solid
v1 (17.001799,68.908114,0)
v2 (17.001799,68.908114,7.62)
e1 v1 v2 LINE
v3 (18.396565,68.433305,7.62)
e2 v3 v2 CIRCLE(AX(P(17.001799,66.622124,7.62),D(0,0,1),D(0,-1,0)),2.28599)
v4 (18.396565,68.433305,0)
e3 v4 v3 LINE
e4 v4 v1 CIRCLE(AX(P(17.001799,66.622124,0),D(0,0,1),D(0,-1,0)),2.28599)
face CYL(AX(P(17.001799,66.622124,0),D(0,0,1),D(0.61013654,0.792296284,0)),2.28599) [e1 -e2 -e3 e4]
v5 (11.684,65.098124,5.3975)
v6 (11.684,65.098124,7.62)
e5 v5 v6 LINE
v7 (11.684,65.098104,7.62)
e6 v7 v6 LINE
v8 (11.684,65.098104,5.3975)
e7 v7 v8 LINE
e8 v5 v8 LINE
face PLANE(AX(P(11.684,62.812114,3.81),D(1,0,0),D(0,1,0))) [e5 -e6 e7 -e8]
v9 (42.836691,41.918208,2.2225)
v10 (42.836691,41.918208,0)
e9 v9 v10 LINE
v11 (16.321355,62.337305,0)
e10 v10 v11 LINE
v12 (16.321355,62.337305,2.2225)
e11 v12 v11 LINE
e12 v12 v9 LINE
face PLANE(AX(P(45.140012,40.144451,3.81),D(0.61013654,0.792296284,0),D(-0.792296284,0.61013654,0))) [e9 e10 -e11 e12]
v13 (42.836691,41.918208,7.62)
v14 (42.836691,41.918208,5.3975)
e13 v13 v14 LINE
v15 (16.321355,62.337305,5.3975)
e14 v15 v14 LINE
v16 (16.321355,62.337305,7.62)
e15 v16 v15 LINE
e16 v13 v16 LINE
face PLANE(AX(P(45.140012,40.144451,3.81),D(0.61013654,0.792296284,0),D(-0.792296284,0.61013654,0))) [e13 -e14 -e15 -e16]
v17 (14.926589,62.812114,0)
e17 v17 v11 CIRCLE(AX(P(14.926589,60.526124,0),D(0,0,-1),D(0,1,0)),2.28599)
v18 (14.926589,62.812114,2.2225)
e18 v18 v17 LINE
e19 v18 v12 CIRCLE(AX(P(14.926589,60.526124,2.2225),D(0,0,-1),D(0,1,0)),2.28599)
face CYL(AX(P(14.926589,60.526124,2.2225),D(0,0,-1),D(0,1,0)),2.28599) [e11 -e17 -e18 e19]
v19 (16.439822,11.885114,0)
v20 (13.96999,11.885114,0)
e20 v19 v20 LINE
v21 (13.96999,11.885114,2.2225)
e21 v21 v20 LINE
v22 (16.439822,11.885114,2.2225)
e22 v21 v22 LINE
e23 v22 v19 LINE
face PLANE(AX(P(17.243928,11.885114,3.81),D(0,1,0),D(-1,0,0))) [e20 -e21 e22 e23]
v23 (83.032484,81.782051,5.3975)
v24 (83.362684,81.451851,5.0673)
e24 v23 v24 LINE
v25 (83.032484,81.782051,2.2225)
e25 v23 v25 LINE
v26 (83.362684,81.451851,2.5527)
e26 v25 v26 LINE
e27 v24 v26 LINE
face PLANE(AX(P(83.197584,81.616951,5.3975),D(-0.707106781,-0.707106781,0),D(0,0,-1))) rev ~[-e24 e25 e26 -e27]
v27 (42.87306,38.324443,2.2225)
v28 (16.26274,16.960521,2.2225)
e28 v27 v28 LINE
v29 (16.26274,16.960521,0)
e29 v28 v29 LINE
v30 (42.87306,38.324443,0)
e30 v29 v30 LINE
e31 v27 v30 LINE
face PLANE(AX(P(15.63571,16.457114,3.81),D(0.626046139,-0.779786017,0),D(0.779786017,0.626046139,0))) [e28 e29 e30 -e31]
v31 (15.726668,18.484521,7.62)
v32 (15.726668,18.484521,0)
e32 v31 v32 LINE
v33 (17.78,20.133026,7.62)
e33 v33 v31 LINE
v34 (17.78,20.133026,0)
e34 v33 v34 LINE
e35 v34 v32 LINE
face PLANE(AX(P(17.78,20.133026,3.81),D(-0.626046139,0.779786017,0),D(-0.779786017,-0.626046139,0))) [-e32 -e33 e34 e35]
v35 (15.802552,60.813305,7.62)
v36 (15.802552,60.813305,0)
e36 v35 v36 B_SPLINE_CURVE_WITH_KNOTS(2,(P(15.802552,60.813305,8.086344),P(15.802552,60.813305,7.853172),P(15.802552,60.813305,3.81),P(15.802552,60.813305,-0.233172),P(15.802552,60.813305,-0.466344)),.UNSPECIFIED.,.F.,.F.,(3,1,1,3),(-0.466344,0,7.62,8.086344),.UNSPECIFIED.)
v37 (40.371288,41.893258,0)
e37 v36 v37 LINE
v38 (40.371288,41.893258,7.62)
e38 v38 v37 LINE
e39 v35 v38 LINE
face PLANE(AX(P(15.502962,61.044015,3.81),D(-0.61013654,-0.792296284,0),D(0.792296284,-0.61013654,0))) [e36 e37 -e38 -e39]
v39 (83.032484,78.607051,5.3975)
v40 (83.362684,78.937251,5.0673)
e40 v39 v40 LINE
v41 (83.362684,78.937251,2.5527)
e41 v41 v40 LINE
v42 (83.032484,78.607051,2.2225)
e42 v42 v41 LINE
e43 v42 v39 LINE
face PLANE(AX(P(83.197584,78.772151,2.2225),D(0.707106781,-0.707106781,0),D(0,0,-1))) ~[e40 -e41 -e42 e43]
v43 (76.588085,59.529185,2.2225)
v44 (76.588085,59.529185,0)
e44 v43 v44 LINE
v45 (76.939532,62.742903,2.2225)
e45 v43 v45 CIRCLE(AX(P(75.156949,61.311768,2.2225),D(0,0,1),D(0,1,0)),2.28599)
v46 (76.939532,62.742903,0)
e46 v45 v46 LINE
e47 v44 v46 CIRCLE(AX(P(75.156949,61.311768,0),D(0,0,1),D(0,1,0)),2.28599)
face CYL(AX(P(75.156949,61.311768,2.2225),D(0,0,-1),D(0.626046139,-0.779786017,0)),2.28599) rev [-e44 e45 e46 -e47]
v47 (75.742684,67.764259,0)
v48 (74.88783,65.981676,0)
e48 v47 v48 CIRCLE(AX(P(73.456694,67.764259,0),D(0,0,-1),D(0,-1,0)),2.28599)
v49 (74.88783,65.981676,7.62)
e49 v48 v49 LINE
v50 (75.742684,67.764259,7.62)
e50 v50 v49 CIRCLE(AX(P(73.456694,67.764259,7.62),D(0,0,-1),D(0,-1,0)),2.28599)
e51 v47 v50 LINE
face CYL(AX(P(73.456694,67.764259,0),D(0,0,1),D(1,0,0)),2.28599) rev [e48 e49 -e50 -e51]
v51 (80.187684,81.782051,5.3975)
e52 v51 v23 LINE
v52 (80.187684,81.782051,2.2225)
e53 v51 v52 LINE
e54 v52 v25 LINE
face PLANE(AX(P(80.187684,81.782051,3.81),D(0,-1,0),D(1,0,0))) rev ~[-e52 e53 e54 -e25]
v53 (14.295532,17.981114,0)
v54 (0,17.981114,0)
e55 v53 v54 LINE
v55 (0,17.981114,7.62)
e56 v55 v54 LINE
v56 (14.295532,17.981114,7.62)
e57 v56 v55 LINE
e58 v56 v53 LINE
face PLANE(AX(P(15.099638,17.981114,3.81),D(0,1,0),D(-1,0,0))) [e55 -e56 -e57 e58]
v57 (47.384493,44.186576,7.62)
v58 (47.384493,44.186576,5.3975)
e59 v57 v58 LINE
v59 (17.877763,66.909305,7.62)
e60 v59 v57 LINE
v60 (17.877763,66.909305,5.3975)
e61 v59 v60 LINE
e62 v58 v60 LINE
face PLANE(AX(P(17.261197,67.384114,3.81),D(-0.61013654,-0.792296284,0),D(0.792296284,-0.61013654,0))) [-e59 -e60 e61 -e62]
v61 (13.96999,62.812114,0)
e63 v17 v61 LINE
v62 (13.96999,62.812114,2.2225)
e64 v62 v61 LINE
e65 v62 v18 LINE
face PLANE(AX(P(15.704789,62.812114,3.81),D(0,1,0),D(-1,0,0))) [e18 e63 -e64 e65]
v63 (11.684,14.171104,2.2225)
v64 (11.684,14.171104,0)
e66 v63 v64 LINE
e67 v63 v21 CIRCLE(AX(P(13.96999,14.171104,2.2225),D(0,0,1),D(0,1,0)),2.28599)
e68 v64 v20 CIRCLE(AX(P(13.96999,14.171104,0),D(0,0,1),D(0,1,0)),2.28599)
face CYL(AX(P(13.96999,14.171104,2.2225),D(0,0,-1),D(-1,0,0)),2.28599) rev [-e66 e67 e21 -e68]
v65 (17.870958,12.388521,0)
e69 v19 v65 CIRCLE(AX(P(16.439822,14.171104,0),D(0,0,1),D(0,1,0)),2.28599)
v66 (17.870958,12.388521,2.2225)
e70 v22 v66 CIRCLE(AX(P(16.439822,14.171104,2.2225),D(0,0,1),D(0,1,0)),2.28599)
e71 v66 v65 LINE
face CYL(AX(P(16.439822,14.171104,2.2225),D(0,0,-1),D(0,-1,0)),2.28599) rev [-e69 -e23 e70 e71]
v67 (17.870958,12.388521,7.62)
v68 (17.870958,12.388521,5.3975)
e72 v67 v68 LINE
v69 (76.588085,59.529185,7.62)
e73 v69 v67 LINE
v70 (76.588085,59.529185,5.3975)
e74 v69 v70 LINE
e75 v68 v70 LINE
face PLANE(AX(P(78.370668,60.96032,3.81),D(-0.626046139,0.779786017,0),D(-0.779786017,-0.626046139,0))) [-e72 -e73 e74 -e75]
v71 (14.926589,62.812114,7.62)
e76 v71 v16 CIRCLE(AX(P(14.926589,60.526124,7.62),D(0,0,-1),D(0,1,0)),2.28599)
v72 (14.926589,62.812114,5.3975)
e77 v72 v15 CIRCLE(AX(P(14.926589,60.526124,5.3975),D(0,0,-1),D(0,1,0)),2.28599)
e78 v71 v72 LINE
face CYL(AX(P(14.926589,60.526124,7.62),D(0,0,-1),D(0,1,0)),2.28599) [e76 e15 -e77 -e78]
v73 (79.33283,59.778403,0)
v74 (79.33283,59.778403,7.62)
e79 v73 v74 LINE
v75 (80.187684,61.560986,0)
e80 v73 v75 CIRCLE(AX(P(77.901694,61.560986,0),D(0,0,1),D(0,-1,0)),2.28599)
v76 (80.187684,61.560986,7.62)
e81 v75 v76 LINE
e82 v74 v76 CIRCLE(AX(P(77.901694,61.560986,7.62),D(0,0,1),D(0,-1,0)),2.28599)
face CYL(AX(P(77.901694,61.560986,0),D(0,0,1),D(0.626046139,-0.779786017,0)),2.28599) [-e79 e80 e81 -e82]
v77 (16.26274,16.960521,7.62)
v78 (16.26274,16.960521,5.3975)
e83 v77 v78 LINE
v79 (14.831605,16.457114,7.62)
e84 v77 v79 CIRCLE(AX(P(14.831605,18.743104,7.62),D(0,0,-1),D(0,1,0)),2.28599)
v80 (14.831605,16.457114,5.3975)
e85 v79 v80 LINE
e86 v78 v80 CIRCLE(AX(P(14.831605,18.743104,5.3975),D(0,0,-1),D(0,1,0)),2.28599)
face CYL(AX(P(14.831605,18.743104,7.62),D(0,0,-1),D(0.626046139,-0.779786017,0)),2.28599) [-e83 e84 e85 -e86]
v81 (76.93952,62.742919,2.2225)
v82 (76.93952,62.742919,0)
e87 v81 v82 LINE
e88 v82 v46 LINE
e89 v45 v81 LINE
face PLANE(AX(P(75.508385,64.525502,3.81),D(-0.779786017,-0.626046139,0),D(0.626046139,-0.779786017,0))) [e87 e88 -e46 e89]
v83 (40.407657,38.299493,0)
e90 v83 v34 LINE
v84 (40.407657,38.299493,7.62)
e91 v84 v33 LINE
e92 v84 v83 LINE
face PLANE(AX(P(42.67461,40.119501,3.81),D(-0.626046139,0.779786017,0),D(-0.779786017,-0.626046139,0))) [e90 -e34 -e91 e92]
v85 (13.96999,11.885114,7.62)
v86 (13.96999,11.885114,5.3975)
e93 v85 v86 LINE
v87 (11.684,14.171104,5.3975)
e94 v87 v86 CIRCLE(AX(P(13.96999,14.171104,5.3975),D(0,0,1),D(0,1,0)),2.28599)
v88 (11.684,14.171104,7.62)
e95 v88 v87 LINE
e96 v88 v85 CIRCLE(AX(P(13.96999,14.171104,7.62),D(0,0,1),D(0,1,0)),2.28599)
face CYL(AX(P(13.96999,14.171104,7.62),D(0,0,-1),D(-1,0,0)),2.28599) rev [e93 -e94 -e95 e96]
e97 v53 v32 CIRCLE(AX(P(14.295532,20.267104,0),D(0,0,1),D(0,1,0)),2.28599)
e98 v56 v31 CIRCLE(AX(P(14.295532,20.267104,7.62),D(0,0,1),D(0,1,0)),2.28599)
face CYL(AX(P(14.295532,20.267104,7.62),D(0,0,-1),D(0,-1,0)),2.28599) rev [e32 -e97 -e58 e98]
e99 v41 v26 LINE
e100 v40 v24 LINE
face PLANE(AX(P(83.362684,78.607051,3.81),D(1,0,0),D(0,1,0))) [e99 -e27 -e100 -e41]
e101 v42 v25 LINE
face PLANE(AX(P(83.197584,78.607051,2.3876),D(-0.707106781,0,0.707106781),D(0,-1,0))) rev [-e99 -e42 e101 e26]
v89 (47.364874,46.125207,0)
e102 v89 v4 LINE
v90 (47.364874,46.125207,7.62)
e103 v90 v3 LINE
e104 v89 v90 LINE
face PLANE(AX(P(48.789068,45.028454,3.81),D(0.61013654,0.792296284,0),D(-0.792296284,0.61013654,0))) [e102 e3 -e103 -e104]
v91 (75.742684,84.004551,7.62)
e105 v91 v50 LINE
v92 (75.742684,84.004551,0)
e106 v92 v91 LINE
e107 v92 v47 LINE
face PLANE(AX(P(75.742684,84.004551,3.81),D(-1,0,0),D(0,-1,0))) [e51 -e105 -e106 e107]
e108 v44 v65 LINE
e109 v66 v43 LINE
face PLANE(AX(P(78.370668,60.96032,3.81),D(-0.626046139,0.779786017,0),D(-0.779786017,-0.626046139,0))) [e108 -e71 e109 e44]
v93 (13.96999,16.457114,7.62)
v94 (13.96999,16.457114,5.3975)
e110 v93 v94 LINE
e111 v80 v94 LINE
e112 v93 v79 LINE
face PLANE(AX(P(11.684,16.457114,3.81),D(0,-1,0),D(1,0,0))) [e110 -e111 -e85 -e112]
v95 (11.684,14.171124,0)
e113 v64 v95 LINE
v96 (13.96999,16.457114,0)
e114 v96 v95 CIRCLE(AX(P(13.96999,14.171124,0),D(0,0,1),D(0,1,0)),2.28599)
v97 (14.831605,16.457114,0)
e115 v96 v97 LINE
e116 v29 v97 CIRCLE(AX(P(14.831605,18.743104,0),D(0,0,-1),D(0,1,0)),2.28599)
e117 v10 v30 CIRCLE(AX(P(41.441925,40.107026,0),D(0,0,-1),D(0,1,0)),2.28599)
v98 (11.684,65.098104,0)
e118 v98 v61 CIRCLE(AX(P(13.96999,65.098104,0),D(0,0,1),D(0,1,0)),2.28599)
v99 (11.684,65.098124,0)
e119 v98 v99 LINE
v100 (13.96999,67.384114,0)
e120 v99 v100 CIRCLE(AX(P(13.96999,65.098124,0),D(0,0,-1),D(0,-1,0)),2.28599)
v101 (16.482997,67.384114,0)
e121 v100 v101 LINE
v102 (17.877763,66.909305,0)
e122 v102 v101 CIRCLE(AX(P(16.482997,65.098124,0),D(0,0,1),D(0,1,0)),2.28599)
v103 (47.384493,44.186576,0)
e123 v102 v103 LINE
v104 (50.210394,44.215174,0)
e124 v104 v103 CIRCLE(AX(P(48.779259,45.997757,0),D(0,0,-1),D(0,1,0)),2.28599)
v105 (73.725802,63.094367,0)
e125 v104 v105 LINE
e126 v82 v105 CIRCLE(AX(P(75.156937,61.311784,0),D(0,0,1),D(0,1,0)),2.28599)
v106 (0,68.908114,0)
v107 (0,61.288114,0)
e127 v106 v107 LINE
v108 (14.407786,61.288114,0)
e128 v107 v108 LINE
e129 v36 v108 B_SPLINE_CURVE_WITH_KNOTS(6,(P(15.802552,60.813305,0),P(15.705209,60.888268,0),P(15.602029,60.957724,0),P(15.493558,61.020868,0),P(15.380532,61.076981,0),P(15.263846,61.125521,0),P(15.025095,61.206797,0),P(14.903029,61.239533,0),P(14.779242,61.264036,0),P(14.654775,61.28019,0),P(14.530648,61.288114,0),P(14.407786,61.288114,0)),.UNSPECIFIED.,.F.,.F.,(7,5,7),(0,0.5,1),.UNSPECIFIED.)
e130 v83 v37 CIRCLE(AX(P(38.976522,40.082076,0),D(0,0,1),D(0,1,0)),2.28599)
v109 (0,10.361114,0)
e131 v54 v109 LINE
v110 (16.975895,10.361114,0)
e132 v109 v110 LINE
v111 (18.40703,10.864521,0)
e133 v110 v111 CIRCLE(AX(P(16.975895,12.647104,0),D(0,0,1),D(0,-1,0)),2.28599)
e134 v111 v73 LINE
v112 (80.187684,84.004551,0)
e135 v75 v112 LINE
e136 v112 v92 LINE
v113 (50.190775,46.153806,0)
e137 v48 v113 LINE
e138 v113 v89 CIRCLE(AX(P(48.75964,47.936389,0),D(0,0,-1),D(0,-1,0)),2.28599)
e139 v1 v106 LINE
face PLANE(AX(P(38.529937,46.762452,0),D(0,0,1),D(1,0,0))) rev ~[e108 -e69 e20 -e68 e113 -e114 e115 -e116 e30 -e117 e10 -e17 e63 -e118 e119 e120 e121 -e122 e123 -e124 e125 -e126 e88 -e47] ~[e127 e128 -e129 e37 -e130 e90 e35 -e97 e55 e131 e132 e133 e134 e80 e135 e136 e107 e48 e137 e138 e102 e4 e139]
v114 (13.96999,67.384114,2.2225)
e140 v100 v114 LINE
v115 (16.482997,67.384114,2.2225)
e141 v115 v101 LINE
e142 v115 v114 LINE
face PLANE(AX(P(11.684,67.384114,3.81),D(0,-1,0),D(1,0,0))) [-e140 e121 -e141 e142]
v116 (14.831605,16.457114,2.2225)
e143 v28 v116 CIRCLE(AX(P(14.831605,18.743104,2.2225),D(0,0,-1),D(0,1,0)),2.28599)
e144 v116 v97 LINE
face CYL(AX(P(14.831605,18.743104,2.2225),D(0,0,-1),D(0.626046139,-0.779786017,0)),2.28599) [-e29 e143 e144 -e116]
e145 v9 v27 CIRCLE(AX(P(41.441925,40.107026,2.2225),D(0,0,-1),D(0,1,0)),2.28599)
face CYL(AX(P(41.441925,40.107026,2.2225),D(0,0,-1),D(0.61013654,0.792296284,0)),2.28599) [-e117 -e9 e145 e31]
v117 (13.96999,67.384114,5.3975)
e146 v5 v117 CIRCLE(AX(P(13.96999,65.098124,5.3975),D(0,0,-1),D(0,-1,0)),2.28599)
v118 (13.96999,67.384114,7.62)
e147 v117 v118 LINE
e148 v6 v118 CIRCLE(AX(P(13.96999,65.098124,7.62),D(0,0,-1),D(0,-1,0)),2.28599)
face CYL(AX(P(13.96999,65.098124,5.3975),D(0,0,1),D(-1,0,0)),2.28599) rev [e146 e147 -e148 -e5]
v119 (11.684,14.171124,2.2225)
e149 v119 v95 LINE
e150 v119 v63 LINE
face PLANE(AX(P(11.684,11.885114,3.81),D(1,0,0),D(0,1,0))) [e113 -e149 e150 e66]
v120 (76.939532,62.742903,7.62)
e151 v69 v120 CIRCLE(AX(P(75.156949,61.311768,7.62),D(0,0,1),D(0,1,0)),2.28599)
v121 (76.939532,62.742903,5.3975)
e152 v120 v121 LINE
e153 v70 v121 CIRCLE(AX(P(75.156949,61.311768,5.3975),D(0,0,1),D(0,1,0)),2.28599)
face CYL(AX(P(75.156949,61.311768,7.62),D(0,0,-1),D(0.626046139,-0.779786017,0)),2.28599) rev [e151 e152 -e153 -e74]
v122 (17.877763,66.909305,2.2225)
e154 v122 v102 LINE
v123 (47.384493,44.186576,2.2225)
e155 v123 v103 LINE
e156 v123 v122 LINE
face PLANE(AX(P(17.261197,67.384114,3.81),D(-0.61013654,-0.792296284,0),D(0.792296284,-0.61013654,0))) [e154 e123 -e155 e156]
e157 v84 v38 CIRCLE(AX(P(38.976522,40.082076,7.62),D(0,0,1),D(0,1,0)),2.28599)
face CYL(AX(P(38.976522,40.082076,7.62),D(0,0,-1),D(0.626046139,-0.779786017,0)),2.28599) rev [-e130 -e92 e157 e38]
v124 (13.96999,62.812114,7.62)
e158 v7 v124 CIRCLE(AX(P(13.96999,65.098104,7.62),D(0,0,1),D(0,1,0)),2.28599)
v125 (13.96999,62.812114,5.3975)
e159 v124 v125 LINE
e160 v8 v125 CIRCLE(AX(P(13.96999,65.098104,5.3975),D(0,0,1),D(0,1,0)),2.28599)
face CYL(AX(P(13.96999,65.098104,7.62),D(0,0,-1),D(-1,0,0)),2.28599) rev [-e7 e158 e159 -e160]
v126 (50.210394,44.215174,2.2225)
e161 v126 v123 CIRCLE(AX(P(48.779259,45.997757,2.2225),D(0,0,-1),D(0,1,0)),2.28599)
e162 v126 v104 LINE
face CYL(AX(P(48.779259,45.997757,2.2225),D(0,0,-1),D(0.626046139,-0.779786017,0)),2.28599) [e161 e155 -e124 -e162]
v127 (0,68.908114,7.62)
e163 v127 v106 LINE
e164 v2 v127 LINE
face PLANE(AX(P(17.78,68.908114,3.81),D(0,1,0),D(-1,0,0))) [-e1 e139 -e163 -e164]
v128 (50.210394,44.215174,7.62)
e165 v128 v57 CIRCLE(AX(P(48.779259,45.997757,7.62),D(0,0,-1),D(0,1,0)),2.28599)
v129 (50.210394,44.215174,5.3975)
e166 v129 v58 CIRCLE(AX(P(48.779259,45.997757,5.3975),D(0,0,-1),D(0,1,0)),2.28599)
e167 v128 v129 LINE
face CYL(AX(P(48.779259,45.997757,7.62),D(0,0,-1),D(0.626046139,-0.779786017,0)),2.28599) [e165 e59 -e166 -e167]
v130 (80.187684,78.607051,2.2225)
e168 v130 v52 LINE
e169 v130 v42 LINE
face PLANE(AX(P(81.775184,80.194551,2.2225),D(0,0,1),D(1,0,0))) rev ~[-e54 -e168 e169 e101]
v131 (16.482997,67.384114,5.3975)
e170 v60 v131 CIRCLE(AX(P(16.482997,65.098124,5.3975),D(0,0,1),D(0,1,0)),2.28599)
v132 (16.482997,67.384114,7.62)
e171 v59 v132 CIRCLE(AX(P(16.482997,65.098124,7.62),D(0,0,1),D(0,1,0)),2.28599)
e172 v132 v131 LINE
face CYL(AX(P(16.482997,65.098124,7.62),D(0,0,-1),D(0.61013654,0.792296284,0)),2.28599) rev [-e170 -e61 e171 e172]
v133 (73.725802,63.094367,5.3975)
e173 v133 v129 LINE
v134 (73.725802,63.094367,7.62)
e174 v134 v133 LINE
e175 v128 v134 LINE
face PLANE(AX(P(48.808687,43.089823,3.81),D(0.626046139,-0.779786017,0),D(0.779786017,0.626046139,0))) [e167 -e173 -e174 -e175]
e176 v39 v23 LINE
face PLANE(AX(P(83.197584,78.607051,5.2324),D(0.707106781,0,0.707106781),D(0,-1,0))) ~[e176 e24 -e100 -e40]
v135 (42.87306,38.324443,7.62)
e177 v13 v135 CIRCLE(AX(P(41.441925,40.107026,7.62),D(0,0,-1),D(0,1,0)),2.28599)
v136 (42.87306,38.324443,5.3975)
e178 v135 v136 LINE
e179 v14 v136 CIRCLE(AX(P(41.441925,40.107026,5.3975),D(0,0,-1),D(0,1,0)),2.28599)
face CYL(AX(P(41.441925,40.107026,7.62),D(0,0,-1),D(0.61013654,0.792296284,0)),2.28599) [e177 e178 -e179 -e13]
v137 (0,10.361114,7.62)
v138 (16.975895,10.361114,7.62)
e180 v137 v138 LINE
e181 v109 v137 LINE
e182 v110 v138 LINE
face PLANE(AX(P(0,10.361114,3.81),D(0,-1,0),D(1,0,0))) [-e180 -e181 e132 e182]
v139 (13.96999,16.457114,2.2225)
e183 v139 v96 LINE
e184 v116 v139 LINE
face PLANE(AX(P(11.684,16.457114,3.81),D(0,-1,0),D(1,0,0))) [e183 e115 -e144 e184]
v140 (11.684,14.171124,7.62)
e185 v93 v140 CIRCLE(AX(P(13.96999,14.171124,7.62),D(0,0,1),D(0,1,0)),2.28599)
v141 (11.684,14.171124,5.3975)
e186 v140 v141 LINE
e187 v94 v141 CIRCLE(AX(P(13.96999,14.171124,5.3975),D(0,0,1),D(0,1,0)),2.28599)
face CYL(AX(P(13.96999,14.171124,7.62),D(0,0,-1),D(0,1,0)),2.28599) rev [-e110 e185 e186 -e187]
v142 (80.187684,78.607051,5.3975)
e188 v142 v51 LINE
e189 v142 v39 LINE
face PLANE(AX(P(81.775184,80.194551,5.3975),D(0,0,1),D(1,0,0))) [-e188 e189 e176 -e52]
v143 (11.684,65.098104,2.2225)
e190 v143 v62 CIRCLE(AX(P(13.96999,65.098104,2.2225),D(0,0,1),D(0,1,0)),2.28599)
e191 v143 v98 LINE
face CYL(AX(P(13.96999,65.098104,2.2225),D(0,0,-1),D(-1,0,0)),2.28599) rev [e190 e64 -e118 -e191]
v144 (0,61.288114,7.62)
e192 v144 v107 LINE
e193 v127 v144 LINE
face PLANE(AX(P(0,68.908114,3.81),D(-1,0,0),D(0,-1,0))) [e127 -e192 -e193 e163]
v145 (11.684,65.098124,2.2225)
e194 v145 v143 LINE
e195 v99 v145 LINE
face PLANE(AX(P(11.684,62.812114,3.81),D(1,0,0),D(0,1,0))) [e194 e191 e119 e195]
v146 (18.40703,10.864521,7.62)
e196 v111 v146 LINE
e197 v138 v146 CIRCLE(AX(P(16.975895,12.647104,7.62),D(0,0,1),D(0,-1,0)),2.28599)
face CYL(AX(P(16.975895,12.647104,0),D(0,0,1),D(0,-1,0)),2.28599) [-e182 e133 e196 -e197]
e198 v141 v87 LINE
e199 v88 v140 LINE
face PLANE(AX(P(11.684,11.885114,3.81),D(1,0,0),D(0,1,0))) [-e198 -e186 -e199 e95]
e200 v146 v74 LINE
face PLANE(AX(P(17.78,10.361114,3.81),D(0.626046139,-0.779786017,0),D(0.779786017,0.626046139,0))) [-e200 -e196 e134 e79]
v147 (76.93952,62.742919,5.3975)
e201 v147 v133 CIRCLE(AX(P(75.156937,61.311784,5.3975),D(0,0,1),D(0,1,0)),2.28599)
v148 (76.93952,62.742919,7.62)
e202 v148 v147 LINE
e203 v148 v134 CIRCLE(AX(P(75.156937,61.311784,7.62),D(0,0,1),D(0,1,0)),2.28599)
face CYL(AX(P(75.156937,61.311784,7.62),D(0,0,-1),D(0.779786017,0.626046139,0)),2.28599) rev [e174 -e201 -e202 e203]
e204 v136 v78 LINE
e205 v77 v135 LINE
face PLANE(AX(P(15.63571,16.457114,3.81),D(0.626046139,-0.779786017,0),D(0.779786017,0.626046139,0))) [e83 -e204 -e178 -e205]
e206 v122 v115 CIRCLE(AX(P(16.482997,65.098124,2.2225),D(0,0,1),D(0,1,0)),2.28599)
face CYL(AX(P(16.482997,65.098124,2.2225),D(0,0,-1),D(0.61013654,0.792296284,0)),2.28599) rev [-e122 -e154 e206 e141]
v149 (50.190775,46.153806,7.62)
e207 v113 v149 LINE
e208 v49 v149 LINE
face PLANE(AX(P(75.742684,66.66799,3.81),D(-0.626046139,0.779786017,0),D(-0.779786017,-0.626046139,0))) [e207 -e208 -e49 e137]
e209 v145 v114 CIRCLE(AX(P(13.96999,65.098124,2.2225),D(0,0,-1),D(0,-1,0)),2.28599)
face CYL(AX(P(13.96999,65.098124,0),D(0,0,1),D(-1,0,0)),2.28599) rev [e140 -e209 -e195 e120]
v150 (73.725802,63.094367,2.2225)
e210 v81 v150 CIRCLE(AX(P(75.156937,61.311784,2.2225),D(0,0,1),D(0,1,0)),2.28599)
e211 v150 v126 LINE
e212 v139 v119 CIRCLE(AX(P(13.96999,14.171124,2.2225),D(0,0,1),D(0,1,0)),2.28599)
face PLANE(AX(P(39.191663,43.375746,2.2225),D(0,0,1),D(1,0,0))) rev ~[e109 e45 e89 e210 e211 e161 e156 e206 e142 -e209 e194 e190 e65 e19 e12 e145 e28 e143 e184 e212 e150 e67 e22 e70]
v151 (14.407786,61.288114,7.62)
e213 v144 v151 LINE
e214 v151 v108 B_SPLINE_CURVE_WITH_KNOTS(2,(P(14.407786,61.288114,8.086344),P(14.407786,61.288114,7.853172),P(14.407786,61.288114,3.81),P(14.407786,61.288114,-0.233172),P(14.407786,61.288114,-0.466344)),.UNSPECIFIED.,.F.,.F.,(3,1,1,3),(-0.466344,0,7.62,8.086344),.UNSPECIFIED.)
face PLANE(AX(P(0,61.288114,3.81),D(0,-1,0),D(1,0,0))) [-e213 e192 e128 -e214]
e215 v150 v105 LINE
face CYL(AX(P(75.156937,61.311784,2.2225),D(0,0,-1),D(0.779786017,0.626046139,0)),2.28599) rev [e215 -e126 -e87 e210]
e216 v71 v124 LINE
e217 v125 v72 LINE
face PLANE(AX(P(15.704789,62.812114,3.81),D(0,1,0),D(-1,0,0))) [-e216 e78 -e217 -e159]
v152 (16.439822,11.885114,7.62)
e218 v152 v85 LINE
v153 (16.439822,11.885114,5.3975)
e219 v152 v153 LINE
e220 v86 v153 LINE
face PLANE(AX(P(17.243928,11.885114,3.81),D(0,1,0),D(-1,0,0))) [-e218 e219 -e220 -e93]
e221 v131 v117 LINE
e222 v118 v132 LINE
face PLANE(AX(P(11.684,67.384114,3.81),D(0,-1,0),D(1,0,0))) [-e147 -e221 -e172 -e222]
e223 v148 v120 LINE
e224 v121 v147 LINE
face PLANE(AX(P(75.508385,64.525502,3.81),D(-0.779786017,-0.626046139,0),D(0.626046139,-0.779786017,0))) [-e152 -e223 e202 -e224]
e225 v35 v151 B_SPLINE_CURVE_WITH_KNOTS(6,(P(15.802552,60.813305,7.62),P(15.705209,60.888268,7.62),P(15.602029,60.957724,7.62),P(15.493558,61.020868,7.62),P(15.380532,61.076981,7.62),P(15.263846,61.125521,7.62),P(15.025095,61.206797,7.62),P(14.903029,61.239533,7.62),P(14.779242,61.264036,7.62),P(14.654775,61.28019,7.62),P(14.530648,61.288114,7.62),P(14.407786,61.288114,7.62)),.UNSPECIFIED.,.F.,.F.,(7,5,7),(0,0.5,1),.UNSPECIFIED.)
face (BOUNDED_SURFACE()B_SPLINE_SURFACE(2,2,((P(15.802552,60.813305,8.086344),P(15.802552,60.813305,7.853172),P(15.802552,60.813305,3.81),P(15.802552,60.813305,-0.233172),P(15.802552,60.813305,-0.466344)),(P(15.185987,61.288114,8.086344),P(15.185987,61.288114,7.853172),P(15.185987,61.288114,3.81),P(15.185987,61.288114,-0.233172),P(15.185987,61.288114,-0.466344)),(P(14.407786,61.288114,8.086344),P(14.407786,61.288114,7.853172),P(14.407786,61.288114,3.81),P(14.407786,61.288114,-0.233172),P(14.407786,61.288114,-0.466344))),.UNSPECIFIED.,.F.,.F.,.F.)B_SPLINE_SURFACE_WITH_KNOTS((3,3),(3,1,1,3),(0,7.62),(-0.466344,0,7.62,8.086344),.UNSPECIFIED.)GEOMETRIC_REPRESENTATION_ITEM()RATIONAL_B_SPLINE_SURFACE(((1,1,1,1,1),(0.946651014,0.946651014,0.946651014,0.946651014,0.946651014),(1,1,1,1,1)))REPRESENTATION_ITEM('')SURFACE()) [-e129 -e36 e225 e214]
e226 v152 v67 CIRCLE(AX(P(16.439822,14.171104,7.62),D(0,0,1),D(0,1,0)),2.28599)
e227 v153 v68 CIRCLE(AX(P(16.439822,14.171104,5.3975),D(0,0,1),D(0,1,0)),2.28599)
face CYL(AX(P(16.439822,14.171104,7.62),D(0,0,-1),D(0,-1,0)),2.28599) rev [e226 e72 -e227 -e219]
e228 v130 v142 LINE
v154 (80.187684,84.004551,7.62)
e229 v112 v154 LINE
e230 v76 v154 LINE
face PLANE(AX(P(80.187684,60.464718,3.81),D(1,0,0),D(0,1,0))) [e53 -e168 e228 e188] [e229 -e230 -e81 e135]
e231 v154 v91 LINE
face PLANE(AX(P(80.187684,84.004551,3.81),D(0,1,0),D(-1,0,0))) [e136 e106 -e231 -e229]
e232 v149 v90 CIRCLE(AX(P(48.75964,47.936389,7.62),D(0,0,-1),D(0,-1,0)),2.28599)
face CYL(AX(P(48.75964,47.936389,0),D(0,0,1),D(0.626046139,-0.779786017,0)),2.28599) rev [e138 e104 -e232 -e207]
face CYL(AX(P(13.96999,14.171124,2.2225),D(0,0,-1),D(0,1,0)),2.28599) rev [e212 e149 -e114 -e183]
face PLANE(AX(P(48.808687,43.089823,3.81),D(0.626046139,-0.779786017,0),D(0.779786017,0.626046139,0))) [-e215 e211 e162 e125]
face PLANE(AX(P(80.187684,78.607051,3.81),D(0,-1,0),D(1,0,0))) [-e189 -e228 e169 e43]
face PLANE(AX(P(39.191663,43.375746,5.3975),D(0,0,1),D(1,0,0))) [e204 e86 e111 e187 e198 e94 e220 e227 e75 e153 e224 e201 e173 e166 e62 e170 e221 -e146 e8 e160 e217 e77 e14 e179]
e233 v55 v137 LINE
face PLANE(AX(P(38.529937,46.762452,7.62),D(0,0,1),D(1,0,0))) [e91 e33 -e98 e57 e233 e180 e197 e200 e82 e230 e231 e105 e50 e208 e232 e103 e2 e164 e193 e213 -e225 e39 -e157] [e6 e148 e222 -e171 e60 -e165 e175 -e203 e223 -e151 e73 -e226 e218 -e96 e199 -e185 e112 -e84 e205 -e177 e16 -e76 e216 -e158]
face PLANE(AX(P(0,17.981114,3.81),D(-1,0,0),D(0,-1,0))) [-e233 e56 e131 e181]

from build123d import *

# Parameters (mm, degrees)
F1_DEPTH = 3.81
F2_DEPTH = 1.5875
F0_W     = 3.175
F0_H     = 3.175
F3_DEPTH = 1.5875
F4_R     = 2.28599
F5_SIZE  = 0.3302


# Not quite as in the source:
# - a fillet or chamfer is up to 0.001 mm smaller than in the source, because OpenCascade refuses the exact size


with BuildPart() as f1:
    # F0 (on Top) → F1 (new body, symmetric)
    with BuildSketch(Plane.XY):
        Polygon((0, 17.9811139863), (0, 10.3611139863), (17.78, 10.3611139863), (80.1876843047, 60.4647179591), (80.1876843047, 78.6070511723), (80.1876843047, 81.7820511723), (80.1876843047, 84.0045511723), (75.7426843047, 84.0045511723), (75.7426843047, 66.6679901496), (48.789068088, 45.0284544481), (17.78, 68.9081139863), (0, 68.9081139863), (0, 61.2881139863), (15.1859866786, 61.2881139863), (15.5029622538, 61.0440154278), (42.6746095935, 40.1195011625), (17.78, 20.1330255541), (15.0996375684, 17.9811139863), align=None)
        Polygon((11.684, 67.3841139863), (17.2611973357, 67.3841139863), (48.8086871908, 43.0898232038), (75.5083847301, 64.5255019445), (78.3706676759, 60.9603202747), (17.2439275137, 11.8851139863), (11.684, 11.8851139863), (11.684, 16.4571139863), (15.6357100547, 16.4571139863), (45.1400120941, 40.1444512324), (15.7047893428, 62.8121139863), (11.684, 62.8121139863), align=None, mode=Mode.SUBTRACT)
    extrude(amount=F1_DEPTH, both=True)

    # F0 (on Top) → F2 (join, symmetric)
    with BuildSketch(Plane.XY):
        Polygon((48.8086871908, 43.0898232038), (17.2611973357, 67.3841139863), (11.684, 67.3841139863), (11.684, 62.8121139863), (15.7047893428, 62.8121139863), (45.1400120941, 40.1444512324), (15.6357100547, 16.4571139863), (11.684, 16.4571139863), (11.684, 11.8851139863), (17.2439275137, 11.8851139863), (78.3706676759, 60.9603202747), (75.5083847301, 64.5255019445), align=None)
    extrude(amount=F2_DEPTH, both=True)

    # F0 (on Top) → F3 (join, symmetric)
    with BuildSketch(Plane.XY):
        with Locations((81.7751843047, 80.1945511723)):
            Rectangle(F0_W, F0_H)
    extrude(amount=F3_DEPTH, both=True)

    # F4 (radius 2.286 in the source; OpenCascade refuses exactly that, so slightly less here)
    f4_edges = [f1.edges().sort_by_distance(p)[0] for p in [
        (15.185987, 61.288114, 0),
        (11.684, 62.812114, 2.69875),
        (15.704789, 62.812114, 2.69875),
        (11.684, 67.384114, 2.69875),
        (17.261197, 67.384114, 2.69875),
        (17.78, 68.908114, 0),
        (15.704789, 62.812114, -2.69875),
        (11.684, 62.812114, -2.69875),
        (11.684, 67.384114, -2.69875),
        (17.261197, 67.384114, -2.69875),
        (48.808687, 43.089823, 2.69875),
        (45.140012, 40.144451, 2.69875),
        (42.67461, 40.119501, 0),
        (48.789068, 45.028454, 0),
        (48.808687, 43.089823, -2.69875),
        (45.140012, 40.144451, -2.69875),
        (75.508385, 64.525502, -2.69875),
        (78.370668, 60.96032, -2.69875),
        (80.187684, 60.464718, 0),
        (75.742684, 66.66799, 0),
        (78.370668, 60.96032, 2.69875),
        (75.508385, 64.525502, 2.69875),
        (15.63571, 16.457114, 2.69875),
        (11.684, 16.457114, 2.69875),
        (11.684, 11.885114, 2.69875),
        (17.243928, 11.885114, 2.69875),
        (11.684, 16.457114, -2.69875),
        (15.63571, 16.457114, -2.69875),
        (17.243928, 11.885114, -2.69875),
        (11.684, 11.885114, -2.69875),
        (17.78, 10.361114, 0),
        (15.099638, 17.981114, 0),
    ]]
    fillet(f4_edges, radius=F4_R)

    # F5
    f5_edges = [f1.edges().sort_by_distance(p)[0] for p in [
        (83.362684, 78.607051, 0),
        (83.362684, 80.194551, -1.5875),
        (83.362684, 81.782051, 0),
        (83.362684, 80.194551, 1.5875),
    ]]
    chamfer(f5_edges, length=F5_SIZE)


with BuildPart() as f1_1:
    # F6: moved
    add(f1.part.moved(Location((0, 0, 3.81))))


solid = f1_1.part
